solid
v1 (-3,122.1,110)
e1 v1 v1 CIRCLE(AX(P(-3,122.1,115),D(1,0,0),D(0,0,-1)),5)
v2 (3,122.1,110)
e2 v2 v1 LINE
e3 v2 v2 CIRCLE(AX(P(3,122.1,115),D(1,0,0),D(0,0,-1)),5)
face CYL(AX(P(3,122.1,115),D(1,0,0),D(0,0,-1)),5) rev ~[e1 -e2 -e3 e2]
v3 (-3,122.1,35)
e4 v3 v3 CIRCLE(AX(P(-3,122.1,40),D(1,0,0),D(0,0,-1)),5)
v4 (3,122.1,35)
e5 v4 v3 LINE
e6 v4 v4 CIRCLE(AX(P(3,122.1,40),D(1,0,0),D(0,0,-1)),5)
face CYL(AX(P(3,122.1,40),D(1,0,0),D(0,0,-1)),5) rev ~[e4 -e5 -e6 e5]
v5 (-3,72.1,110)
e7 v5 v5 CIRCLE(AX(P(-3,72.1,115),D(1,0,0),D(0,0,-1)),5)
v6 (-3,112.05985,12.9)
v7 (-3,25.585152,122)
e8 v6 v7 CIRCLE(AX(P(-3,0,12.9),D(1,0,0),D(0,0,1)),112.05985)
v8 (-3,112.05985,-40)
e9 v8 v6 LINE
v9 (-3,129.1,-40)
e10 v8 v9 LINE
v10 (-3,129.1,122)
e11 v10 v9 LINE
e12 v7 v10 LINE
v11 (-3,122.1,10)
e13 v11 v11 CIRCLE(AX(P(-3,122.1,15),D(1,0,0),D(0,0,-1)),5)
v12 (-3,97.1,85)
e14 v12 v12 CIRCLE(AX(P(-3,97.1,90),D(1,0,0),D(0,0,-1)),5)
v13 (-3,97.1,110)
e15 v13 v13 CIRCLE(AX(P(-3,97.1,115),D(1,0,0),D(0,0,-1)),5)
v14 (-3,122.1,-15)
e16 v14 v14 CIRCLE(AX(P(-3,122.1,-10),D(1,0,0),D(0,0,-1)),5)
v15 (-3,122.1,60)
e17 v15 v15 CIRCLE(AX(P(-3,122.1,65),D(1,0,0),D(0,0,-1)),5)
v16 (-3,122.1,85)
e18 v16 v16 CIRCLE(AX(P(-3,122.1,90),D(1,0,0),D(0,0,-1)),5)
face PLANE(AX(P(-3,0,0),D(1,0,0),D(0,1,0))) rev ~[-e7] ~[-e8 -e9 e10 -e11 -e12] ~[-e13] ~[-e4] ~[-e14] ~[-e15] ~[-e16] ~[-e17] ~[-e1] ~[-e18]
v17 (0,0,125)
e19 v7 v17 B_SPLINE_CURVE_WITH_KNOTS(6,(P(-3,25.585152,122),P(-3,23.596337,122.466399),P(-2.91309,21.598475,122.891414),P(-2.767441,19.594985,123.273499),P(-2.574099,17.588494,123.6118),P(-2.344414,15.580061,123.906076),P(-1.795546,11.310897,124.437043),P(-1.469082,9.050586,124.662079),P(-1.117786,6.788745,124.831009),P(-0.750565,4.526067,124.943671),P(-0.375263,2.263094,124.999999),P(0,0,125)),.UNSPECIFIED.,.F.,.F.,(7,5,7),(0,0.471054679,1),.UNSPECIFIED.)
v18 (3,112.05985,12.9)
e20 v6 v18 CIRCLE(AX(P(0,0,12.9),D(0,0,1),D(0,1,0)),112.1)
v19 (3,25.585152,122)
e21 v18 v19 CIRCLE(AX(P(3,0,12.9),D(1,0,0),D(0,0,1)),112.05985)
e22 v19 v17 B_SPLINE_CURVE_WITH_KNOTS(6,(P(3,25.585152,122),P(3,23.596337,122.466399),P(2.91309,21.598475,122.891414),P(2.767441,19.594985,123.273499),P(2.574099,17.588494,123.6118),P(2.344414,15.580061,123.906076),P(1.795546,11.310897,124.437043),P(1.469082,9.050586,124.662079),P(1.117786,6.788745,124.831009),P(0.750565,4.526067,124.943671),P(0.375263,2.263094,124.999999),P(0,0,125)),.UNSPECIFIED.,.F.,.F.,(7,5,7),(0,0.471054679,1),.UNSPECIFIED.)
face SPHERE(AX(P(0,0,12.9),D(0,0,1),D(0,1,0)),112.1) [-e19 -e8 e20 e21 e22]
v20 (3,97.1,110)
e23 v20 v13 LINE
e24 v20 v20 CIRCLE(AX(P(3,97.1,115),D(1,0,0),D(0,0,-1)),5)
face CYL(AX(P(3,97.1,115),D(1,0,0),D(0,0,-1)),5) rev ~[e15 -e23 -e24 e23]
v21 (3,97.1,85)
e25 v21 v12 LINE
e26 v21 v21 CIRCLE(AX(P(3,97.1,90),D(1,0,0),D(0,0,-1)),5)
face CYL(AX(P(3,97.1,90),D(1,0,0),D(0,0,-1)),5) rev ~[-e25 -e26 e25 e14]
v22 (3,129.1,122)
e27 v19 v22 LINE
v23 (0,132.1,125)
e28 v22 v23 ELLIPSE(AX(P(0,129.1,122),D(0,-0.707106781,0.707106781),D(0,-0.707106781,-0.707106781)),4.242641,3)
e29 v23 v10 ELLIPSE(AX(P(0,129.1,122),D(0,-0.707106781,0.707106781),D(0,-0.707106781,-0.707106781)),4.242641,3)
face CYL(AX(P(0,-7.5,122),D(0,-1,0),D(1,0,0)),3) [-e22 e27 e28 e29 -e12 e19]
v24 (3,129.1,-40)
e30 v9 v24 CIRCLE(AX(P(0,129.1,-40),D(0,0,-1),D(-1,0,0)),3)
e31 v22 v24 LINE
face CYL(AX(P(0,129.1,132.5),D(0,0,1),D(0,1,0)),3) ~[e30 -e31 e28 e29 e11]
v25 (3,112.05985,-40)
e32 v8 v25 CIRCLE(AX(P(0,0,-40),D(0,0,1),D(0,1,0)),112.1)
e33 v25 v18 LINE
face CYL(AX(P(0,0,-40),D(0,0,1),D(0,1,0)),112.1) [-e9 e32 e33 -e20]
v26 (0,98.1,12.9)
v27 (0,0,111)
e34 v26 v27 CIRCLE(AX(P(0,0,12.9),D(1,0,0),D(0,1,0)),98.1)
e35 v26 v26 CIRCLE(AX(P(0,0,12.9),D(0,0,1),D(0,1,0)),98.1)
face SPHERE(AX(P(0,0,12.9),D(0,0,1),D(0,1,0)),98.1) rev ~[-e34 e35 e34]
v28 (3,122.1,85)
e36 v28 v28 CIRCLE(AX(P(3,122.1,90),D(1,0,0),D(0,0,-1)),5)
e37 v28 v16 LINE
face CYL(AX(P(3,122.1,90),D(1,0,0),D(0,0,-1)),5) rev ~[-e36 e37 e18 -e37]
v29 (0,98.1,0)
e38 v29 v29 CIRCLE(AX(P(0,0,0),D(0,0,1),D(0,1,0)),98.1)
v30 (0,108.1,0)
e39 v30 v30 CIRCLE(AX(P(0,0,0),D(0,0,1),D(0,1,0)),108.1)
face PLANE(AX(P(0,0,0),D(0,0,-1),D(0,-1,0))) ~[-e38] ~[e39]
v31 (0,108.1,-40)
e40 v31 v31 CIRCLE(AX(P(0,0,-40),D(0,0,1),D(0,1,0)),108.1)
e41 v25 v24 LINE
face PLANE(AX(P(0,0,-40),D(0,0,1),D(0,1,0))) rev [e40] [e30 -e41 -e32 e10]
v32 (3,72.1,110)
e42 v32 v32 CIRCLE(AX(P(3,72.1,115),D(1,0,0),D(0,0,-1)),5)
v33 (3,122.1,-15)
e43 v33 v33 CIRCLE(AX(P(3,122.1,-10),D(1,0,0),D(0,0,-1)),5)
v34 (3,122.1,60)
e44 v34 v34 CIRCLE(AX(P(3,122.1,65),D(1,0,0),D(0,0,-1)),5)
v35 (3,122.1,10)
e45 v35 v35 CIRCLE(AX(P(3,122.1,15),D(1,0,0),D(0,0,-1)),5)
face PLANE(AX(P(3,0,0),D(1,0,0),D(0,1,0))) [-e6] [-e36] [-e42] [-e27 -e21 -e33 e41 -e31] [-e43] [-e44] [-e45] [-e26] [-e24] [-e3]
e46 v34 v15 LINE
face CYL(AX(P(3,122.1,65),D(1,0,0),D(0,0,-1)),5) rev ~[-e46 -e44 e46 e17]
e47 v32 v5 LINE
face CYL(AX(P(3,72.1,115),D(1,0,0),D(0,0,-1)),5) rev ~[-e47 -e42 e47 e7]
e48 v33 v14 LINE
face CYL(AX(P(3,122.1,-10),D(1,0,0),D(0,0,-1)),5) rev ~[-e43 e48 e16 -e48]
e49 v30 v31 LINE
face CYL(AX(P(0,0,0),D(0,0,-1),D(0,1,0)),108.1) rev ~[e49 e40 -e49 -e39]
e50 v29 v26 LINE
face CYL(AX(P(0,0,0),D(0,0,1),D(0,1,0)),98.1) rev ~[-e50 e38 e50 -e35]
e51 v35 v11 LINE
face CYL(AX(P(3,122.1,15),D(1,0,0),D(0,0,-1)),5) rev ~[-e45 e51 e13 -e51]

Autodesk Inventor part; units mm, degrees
ref_plane "YZ Plane" through (0, 0, 0) normal (1, 0, 0) x (0, 1, 0)
ref_plane "XZ Plane" through (0, 0, 0) normal (0, 1, 0) x (-1, 0, 0)
sketch "Sketch1" plane through (0, 0, 0) normal (1, 0, 0) x (0, 1, 0)
  line L0 (107.6, 0) -> (-107.6, 0) construction
  line L1 (108.1, 0) -> (108.1, -40)
  line L2 (108.1, -40) -> (112.1, -40)
  line L3 (112.1, -40) -> (112.1, 12.9)
  line L4 (0, 0) -> (0, 125)
  arc A0 (112.1, 12.9) -> (0, 125) centre (0, 12.9) ccw
  line L5 (108.1, 0) -> (0, 0)
  line L6 (98.1, 0) -> (98.1, 12.9)
  arc A1 (98.1, 12.9) -> (0, 111) centre (0, 12.9) ccw
  line L7 (99.6, 0) -> (99.6, -254) construction
  line L8 (107.6, -254) -> (107.6, 0) construction
  dimension "d0" = 125
  dimension "d2" = 40
  dimension "d5" = 10
  dimension "d8" = 0.5
  dimension "d9" = 4
revolve "Revolution1" add sketch "Sketch1" angle 360 about axis through (0, 0, 0) along (0, 0, 1) contours L5 L6 A1 L4 A0 L3 L2 L1
ref_plane "Work Plane1" through (0, 108.1, -624) normal (0, 0, 1) x (1, 0, 0)
sketch "Sketch6" plane through (0, 0, 0) normal (1, 0, 0) x (0, 1, 0)
  arc A0 (112.1, 12.9) -> (-112.1, 12.9) centre (0, 12.9) ccw construction
  arc A1 (98.1, 12.9) -> (-98.1, 12.9) centre (0, 12.9) ccw construction
  line L0 (98.1, 12.9) -> (98.1, 0) construction
  line L1 (112.1, -40) -> (112.1, 12.9) construction
  line L2 (108.1, 0) -> (108.1, -40) construction
  line L3 (108.1, 0) -> (-108.1, 0) construction
  line L4 (112.1, 12.9) -> (-112.1, 12.9) construction
  arc A2 (108.1, 12.9) -> (0, 121) centre (0, 12.9) ccw
  line L5 (0, 125) -> (132.1, 125)
  line L6 (132.1, 125) -> (132.1, -40)
  line L7 (132.1, -40) -> (108.1, -40)
  line L8 (108.1, 12.9) -> (108.1, -40)
  line L9 (112.1, -40) -> (-112.1, -40) projected
  line L10 (0, 125) -> (0, 121)
  point P0 (0, 0)
  point P1 (0, 0)
  dimension "d33" = 20
extrude "Extrusion5" add sketch "Sketch6" along normal mid plane 6
sketch "Sketch7" plane through (3, 0, 0) normal (1, 0, 0) x (0, 0, -1)
  arc A0 (-12.9, 112.0599) -> (-124.9599, 0) centre (-12.9, 0) ccw construction
  line L0 (40, 112.0599) -> (-12.9, 112.0599) construction
  line L1 (40, 112.0599) -> (40, 132.1) construction
  line L2 (40, 132.1) -> (-125, 132.1) construction
  line L3 (-125, 132.1) -> (-125, 0) construction
  circle A1 centre (-115, 72.1) radius 5
  circle A2 centre (-115, 97.1) radius 5
  circle A3 centre (-115, 122.1) radius 5
  circle A4 centre (-90, 122.1) radius 5
  circle A5 centre (-65, 122.1) radius 5
  circle A6 centre (-40, 122.1) radius 5
  circle A7 centre (-15, 122.1) radius 5
  circle A8 centre (10, 122.1) radius 5
  circle A9 centre (-90, 97.1) radius 5
  line L4 (-125, 0) -> (-124.9599, 0) projected
  point P0 (0, 0)
  dimension "d37" = 10
  dimension "d38" = 10
  dimension "d39" = 10
  dimension "d40" = 10
  dimension "d41" = 10
  dimension "d42" = 10
  dimension "d43" = 10
  dimension "d44" = 10
  dimension "d45" = 10
  dimension "d46" = 25
  dimension "d47" = 25
  dimension "d50" = 25
  dimension "d51" = 25
  dimension "d52" = 25
  dimension "d53" = 25
  dimension "d54" = 10
  dimension "d55" = 25
  dimension "d56" = 10
extrude "Extrusion6" cut sketch "Sketch7" against normal through all
fillet "Fillet3" radius 3 4 edges at (3, 66.05, 125) (-3, 66.05, 125) (-3, 132.1, 42.5) (3, 132.1, 42.5)
properties part number "FrontCapV1_3DPrint"
